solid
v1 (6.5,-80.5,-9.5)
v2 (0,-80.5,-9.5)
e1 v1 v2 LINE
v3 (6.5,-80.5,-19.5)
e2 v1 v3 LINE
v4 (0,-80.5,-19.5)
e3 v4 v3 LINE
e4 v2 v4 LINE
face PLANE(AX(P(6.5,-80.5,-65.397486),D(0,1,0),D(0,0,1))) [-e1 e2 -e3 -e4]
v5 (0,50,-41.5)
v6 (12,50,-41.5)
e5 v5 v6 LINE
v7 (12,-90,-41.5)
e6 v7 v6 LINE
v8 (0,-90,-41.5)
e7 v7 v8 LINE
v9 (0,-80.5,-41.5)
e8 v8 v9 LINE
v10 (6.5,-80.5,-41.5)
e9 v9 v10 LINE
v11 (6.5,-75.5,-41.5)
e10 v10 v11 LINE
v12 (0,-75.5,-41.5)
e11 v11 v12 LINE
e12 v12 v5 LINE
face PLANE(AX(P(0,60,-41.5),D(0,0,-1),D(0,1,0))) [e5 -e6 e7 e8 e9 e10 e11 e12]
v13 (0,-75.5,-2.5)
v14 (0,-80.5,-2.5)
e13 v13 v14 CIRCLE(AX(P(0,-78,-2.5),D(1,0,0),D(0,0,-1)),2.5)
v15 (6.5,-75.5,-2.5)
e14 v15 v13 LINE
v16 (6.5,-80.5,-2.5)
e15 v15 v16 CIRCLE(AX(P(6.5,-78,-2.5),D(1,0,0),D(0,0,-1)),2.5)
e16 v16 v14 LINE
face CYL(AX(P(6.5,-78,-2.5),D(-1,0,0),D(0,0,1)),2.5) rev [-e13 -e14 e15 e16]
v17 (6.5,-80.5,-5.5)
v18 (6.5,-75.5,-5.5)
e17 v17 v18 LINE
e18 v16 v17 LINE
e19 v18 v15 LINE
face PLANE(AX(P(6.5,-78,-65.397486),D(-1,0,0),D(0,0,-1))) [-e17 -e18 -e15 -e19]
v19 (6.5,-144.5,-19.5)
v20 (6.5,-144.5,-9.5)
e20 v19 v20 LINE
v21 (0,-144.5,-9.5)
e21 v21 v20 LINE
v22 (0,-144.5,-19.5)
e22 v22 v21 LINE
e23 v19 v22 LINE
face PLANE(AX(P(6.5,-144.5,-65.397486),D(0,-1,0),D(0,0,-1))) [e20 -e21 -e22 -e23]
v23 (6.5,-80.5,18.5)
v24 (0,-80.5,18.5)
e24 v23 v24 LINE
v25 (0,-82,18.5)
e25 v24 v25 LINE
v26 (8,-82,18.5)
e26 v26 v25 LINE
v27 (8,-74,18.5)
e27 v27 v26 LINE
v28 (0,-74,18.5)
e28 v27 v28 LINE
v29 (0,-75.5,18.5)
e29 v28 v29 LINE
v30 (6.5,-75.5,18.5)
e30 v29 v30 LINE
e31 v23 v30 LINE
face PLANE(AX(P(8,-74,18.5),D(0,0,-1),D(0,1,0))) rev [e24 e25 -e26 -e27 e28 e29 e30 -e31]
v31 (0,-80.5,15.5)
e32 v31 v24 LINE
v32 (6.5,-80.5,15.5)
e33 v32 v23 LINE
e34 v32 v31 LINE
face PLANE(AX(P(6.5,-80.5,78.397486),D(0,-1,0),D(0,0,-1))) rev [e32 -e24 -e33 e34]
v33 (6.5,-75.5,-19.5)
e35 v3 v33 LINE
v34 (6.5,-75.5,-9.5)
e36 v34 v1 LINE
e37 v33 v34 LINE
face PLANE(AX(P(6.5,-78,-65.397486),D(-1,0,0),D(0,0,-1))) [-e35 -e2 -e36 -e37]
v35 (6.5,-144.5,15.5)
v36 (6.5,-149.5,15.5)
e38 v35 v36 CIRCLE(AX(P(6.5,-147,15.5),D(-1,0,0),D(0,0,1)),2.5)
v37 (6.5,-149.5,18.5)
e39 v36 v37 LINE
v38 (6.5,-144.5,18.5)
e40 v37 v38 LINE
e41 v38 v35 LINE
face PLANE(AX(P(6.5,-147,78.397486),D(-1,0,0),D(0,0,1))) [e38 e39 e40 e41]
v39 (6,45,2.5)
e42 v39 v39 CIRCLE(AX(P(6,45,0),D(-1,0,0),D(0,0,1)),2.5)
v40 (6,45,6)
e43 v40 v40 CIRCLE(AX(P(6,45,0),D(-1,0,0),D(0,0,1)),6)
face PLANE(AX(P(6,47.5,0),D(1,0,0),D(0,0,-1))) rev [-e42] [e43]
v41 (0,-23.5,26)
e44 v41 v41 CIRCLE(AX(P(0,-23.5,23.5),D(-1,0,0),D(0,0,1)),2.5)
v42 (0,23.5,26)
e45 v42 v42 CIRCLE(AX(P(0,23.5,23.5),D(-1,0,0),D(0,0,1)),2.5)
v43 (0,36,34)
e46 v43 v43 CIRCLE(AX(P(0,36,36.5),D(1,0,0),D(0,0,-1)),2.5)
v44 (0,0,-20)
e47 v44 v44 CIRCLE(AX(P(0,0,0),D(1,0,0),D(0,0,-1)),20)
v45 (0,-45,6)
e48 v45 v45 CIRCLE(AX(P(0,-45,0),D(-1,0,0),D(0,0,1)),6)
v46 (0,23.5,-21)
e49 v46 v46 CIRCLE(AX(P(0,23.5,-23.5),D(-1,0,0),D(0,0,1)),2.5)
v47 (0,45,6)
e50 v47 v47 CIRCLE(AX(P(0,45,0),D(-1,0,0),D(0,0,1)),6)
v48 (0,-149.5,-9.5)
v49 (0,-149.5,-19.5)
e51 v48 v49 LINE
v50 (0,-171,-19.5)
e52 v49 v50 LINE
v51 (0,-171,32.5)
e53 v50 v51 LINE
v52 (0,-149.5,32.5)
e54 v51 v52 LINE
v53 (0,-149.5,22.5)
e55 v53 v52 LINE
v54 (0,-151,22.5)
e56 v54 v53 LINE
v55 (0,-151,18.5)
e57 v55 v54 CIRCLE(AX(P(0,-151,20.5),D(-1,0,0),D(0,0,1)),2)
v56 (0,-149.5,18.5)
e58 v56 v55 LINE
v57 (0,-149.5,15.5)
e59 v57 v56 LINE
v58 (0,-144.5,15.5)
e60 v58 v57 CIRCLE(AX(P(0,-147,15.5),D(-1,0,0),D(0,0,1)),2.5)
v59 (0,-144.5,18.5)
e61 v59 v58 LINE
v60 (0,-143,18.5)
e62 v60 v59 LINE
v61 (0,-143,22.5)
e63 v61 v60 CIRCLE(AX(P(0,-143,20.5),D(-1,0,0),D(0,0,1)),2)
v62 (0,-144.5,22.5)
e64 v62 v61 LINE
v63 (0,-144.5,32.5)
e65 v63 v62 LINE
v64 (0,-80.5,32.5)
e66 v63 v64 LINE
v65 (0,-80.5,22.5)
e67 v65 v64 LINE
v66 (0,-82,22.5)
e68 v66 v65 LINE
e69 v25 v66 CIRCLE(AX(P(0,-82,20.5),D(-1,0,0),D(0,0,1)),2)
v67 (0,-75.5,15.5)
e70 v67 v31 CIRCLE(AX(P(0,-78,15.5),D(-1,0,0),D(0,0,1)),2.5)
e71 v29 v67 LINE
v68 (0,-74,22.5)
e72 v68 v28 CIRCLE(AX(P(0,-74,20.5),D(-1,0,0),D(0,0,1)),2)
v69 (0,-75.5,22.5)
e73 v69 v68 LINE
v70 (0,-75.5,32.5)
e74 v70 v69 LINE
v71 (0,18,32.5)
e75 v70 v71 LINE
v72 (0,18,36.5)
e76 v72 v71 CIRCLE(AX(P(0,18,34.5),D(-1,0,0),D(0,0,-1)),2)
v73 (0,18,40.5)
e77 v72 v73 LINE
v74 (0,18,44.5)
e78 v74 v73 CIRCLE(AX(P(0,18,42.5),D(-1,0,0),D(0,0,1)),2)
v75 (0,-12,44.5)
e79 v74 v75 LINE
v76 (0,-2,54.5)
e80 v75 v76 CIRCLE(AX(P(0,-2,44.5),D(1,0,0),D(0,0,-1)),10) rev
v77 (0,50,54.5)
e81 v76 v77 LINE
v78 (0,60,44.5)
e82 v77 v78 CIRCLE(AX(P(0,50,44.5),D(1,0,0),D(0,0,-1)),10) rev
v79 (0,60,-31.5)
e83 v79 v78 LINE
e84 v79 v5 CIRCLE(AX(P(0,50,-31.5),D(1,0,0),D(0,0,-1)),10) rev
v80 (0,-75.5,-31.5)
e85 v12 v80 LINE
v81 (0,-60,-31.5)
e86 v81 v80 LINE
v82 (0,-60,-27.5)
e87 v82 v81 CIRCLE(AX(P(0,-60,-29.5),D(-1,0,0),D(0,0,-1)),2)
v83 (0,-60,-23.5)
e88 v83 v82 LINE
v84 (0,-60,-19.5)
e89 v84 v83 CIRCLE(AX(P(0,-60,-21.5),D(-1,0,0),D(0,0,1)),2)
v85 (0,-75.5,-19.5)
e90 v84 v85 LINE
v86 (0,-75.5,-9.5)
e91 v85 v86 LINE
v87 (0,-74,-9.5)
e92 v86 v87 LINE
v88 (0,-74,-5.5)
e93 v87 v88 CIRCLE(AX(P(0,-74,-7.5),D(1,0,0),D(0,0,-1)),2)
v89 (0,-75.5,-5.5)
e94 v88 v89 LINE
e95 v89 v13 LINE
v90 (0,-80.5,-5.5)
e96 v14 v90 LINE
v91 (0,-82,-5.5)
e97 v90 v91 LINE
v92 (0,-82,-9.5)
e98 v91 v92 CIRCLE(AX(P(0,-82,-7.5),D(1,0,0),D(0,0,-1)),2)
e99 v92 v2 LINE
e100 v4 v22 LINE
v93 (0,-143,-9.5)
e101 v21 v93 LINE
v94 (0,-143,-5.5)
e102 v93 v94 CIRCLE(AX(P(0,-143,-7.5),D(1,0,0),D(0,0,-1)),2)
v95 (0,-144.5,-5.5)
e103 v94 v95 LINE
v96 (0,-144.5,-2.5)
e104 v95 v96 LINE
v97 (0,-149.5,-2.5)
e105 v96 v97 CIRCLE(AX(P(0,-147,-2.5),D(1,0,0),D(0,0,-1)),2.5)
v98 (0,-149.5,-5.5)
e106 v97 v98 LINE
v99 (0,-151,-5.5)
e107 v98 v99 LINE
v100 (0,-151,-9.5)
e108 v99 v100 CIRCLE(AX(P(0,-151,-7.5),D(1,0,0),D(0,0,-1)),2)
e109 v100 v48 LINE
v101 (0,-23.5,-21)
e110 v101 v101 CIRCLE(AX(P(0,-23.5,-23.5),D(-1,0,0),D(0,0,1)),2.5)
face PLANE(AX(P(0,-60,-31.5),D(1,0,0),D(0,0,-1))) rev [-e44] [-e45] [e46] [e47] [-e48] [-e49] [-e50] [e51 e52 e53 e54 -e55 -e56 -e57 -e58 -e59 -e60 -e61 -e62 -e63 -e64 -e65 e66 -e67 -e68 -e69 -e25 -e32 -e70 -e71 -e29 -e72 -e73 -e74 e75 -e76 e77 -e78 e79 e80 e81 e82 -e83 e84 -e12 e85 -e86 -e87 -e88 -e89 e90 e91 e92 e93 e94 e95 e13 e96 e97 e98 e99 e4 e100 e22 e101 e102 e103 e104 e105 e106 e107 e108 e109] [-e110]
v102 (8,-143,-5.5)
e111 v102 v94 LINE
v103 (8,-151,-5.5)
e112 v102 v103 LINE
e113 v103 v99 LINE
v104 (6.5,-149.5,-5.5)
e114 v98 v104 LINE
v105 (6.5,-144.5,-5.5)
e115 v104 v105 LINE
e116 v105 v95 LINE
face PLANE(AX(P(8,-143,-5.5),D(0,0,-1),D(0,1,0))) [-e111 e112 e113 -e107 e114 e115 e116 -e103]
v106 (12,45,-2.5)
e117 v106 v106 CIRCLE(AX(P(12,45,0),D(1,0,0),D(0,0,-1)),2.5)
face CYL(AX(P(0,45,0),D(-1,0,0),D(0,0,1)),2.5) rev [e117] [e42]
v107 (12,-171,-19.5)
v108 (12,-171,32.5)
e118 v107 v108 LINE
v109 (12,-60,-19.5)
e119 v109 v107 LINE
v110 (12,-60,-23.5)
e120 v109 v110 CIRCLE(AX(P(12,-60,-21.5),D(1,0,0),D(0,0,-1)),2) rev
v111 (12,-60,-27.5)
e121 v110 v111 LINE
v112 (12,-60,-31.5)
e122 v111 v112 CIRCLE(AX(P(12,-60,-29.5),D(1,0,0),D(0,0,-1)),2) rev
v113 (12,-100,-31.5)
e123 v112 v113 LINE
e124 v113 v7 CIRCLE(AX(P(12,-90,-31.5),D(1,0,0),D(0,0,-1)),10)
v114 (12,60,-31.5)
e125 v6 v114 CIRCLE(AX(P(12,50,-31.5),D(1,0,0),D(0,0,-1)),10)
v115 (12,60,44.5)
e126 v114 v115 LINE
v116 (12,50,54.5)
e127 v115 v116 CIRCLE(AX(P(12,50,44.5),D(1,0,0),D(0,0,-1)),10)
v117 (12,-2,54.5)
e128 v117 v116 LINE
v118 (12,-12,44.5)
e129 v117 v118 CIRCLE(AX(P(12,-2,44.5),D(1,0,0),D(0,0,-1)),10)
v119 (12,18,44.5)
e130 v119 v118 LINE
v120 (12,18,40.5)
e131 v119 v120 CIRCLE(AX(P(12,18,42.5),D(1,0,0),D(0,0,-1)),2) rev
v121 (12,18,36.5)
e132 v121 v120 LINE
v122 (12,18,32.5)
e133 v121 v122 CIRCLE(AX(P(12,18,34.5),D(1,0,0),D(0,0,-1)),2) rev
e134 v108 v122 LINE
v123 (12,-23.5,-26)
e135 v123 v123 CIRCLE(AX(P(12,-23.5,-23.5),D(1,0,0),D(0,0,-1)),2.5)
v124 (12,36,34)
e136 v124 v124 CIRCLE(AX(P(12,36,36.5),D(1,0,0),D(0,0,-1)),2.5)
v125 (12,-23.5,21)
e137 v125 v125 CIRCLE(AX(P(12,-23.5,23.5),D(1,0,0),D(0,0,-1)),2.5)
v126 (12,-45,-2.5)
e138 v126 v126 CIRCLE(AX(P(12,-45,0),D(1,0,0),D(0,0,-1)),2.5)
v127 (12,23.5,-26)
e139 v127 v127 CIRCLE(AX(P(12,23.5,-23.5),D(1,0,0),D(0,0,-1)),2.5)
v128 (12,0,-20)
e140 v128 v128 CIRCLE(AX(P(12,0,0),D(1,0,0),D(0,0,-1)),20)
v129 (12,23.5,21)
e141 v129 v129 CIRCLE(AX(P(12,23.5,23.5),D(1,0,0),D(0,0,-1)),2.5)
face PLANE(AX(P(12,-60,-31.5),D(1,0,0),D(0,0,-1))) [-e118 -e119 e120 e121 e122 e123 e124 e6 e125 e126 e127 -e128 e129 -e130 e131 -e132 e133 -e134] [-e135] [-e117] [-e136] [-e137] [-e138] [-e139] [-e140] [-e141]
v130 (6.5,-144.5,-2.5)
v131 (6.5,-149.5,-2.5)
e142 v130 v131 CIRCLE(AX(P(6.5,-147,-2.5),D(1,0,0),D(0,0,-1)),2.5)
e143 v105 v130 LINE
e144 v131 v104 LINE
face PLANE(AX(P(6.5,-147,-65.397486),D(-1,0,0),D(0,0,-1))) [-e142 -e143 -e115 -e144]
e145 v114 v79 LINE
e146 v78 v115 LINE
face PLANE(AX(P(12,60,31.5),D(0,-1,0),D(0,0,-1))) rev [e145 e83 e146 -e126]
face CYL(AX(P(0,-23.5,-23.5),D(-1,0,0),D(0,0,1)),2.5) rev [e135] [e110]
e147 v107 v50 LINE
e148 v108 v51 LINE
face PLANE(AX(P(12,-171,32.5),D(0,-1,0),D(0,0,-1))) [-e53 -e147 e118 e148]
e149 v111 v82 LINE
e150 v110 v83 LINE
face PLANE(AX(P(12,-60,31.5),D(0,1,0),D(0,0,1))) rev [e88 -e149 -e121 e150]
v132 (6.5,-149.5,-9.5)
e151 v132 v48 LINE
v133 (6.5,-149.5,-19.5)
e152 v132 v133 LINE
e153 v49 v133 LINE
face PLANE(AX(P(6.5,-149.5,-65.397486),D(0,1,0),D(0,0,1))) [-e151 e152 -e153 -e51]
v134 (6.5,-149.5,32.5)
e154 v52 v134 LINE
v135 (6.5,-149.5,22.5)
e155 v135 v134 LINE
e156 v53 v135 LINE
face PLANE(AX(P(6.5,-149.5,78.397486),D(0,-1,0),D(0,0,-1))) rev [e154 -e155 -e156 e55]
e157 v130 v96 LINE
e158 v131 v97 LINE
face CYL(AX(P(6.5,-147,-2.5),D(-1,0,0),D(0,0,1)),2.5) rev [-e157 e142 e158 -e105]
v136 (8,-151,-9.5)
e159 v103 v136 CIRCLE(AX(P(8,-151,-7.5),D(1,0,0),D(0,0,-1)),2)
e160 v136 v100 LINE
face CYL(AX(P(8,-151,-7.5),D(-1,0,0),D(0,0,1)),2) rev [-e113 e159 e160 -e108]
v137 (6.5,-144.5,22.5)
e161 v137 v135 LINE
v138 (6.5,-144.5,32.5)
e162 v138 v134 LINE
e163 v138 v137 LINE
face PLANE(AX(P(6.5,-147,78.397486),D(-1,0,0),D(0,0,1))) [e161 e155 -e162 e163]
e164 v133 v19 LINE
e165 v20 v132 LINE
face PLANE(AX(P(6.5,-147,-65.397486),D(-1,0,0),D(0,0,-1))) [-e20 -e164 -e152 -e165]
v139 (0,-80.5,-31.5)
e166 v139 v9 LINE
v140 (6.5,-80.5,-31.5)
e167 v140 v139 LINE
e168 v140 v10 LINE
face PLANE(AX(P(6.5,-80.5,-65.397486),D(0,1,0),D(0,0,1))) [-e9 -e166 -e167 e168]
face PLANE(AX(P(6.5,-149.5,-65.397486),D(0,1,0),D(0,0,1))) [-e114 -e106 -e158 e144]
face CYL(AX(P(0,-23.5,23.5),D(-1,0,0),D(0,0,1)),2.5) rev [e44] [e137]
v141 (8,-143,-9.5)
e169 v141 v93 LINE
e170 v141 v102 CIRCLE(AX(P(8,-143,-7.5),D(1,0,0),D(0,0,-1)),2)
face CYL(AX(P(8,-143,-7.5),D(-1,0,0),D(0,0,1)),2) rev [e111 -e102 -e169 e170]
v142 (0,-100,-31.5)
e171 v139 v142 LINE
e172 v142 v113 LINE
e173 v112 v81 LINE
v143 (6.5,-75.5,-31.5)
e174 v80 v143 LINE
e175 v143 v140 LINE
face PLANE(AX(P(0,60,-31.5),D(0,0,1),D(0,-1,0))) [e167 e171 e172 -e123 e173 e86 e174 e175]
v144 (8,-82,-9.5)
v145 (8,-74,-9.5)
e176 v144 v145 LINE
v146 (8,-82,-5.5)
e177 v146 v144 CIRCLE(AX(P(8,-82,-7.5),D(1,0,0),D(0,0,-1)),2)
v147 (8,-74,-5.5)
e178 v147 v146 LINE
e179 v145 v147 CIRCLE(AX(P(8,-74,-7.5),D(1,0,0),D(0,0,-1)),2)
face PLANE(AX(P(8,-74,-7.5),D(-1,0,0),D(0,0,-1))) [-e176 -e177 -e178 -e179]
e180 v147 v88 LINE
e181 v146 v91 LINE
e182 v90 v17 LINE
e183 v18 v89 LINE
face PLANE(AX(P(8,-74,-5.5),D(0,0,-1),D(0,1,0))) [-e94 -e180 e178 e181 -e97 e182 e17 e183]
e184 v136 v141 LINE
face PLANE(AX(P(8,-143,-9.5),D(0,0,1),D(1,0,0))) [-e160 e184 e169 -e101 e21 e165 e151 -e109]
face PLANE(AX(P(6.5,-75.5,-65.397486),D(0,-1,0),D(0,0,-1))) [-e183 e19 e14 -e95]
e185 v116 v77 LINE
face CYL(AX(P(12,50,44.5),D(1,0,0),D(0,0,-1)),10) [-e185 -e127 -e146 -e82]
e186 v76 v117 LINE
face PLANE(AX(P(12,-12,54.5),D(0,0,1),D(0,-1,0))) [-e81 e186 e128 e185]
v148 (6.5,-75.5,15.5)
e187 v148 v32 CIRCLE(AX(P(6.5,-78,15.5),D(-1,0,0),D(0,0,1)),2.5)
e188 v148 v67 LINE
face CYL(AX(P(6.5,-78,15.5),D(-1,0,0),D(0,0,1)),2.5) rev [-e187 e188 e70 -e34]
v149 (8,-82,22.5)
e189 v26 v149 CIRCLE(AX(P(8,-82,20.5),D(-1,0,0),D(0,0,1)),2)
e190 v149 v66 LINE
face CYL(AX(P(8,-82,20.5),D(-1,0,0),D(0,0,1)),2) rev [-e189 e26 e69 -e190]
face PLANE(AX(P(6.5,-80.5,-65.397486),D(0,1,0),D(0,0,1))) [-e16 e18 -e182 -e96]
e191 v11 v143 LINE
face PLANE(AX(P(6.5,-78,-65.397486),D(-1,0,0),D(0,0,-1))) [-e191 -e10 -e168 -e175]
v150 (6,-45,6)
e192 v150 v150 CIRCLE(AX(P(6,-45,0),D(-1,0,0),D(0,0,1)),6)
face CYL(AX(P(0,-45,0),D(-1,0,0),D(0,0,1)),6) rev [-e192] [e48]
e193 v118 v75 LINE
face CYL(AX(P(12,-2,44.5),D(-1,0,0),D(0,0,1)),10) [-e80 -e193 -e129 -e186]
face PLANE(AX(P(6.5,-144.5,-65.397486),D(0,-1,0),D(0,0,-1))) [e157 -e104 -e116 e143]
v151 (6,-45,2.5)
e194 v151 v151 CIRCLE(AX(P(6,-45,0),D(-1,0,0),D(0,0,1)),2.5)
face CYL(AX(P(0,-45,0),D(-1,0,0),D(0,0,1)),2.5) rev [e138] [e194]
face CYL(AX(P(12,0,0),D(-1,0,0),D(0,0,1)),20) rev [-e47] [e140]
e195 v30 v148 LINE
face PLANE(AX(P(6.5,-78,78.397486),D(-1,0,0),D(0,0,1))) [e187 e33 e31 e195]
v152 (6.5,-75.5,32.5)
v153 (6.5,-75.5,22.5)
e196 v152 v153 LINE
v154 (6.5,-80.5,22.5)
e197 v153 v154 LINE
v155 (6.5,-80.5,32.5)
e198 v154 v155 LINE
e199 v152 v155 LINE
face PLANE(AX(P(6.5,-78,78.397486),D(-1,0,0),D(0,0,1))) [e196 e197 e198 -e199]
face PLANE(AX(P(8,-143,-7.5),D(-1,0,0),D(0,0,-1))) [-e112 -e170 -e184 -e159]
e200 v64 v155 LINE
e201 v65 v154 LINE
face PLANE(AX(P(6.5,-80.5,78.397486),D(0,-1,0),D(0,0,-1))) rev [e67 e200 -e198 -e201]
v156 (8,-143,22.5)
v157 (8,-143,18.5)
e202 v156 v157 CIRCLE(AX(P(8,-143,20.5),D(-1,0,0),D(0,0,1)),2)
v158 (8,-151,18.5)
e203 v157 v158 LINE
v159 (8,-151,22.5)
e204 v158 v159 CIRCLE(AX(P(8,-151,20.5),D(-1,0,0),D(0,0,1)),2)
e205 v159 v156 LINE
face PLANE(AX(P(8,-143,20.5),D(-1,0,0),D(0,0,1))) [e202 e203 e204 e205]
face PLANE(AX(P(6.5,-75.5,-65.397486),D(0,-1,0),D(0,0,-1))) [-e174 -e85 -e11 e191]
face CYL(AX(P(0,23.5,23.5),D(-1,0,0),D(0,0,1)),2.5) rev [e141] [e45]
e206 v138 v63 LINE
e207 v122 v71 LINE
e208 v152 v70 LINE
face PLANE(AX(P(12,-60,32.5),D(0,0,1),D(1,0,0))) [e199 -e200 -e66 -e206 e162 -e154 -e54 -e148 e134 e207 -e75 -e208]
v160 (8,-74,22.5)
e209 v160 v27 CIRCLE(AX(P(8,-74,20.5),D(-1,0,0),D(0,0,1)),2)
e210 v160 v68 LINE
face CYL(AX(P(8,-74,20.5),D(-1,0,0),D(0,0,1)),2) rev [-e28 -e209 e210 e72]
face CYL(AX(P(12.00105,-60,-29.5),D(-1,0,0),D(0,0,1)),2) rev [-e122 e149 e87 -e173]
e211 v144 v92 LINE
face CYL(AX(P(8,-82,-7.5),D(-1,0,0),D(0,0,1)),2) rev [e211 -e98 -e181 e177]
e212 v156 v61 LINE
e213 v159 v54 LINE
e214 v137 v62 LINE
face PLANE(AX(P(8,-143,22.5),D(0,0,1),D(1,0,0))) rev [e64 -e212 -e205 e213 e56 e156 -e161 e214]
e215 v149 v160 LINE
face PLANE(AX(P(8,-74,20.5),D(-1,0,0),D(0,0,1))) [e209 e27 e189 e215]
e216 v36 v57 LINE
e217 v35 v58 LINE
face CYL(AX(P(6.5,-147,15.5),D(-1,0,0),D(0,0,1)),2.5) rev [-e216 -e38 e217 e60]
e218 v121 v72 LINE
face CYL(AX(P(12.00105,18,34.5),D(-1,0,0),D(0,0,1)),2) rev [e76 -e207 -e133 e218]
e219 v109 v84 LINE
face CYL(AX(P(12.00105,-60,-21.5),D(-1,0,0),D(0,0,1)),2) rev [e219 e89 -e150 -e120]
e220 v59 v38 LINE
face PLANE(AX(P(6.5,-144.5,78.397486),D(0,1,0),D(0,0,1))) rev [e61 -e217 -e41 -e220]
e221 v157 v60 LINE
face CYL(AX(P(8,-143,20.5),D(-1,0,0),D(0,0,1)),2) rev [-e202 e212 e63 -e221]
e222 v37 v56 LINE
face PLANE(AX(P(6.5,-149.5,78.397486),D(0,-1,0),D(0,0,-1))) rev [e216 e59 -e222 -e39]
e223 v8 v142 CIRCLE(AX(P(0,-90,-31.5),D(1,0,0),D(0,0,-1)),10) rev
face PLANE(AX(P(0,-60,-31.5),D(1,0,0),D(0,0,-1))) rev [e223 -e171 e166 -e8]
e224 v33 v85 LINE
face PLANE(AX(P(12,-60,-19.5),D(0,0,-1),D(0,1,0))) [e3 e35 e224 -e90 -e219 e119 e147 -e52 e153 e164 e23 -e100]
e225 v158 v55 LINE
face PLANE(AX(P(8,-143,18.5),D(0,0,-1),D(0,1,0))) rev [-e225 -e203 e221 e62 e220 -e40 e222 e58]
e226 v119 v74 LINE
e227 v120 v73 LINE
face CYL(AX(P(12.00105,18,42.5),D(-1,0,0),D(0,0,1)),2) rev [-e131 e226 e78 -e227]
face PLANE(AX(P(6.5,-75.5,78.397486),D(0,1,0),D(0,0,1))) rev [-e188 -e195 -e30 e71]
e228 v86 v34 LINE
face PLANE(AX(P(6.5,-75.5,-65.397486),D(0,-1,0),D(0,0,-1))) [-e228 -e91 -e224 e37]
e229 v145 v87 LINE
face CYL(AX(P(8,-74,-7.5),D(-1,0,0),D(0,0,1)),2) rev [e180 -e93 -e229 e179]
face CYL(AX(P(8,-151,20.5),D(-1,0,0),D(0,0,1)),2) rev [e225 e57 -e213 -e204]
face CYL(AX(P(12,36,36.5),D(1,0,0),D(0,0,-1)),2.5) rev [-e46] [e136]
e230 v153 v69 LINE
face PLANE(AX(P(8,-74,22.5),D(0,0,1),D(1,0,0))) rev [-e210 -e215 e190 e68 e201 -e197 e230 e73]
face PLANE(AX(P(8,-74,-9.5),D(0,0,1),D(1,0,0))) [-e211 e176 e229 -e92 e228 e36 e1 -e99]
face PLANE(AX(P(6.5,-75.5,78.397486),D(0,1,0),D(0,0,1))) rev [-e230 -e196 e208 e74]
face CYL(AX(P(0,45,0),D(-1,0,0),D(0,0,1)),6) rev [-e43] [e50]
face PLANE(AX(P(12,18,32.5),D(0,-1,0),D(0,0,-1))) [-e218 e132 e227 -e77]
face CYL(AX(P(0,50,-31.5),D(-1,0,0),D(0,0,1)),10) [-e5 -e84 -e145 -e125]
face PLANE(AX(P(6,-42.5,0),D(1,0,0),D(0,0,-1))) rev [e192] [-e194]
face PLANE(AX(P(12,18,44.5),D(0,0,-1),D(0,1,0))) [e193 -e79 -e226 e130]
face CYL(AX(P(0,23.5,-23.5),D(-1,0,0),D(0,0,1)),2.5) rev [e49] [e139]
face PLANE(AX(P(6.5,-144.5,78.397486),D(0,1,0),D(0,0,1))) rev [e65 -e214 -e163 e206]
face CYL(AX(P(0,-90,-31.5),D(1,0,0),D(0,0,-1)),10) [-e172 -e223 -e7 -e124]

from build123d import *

# Parameters (mm, degrees)
SKETCH1_W                          = 63
SKETCH1_H                          = 120
SKETCH1_R                          = 20
BOSS_EXTRUDE1_DEPTH                = 12
F_5_0_5_DIAMETER_HOLE2_D           = 5
LINEAR_RAIL_MOUNT_HOLE_D           = 5
LINEAR_RAIL_MOUNT_HOLE_CBORE_D     = 12
LINEAR_RAIL_MOUNT_HOLE_CBORE_DEPTH = 6
BOSS_EXTRUDE2_DEPTH                = 12
SKETCH9_W                          = 52
SKETCH9_H                          = 111
BOSS_EXTRUDE3_DEPTH                = 12
SKETCH11_W                         = 10
SKETCH11_H                         = 160
BOSS_EXTRUDE4_DEPTH                = 12
F_5_0_5_DIAMETER_HOLE1_D           = 5
FILLET1_R                          = 10
CUT_EXTRUDE1_REACH                 = 181.876
CUT_EXTRUDE2_DEPTH                 = 8
CUT_EXTRUDE3_DEPTH                 = 6.5
LPATTERN1_COUNT                    = 2
LPATTERN1_PITCH                    = 69
MIRROR1_COPY_1_DEPTH               = 8
MIRROR1_COPY_2_DEPTH               = 6.5


with BuildPart() as part:
    # Sketch1 → Boss-Extrude1 (new body)
    with BuildSketch(Plane(origin=(0, 0, 0), x_dir=(0, 0, -1), z_dir=(1, 0, 0))):
        Rectangle(SKETCH1_W, SKETCH1_H)
        Circle(SKETCH1_R, mode=Mode.SUBTRACT)
    extrude(amount=BOSS_EXTRUDE1_DEPTH)

    # Ø5.0 (5) Diameter Hole2 (through all)
    with Locations(Plane.ZY):
        with Locations((-23.5, 23.5), (23.5, 23.5), (23.5, -23.5), (-23.5, -23.5)):
            Hole(F_5_0_5_DIAMETER_HOLE2_D / 2)

    # Linear Rail Mount Hole (through all)
    with Locations(Plane.ZY):
        with Locations((0, 45), (0, -45)):
            CounterBoreHole(LINEAR_RAIL_MOUNT_HOLE_D / 2, LINEAR_RAIL_MOUNT_HOLE_CBORE_D / 2, LINEAR_RAIL_MOUNT_HOLE_CBORE_DEPTH)

    # Sketch8 → Boss-Extrude2 (add)
    with BuildSketch(Plane.ZY):
        Polygon((44.5, 18), (44.5, -12), (54.5, -12), (54.5, 60), (31.5, 60), (31.5, -60), (32.5, -60), (32.5, 18), align=None)
    extrude(amount=-BOSS_EXTRUDE2_DEPTH)

    # Sketch9 → Boss-Extrude3 (add)
    with BuildSketch(Plane.ZY):
        with Locations((6.5, -115.5)):
            Rectangle(SKETCH9_W, SKETCH9_H)
    extrude(amount=-BOSS_EXTRUDE3_DEPTH)

    # Sketch11 → Boss-Extrude4 (add)
    with BuildSketch(Plane(origin=(12, 0, 0), x_dir=(0, 0, -1), z_dir=(1, 0, 0))):
        with Locations((36.5, -20)):
            Rectangle(SKETCH11_W, SKETCH11_H)
    extrude(amount=-BOSS_EXTRUDE4_DEPTH)

    # Ø5.0 (5) Diameter Hole1 (through all)
    with Locations(Plane(origin=(12, 0, 0), x_dir=(0, 0, -1), z_dir=(1, 0, 0))):
        with Locations((-36.5, 36)):
            Hole(F_5_0_5_DIAMETER_HOLE1_D / 2)

    # Fillet1
    fillet1_edges = [part.edges().sort_by_distance(p)[0] for p in [
        (6, 60, 54.5),
        (6, -12, 54.5),
        (6, -100, -41.5),
        (6, 60, -41.5),
    ]]
    fillet(fillet1_edges, radius=FILLET1_R - 0.0001)  # a hair under: the kernel refuses the full size

    # Sketch25 → Cut-Extrude1 (cut, up to next)
    with BuildSketch(Plane.ZY, mode=Mode.PRIVATE) as cut_extrude1_sk1:
        with BuildLine():
            Line((32.5, 18), (36.5, 18))
            ThreePointArc((36.5, 18), (34.5, 20), (32.5, 18))
        make_face()
    cut_extrude1_tool1 = extrude(cut_extrude1_sk1.sketch, amount=-CUT_EXTRUDE1_REACH, mode=Mode.PRIVATE) & part.part
    # Sketch25 → Cut-Extrude1 (cut, up to next)
    with BuildSketch(Plane.ZY, mode=Mode.PRIVATE) as cut_extrude1_sk2:
        with BuildLine():
            Line((40.5, 18), (44.5, 18))
            ThreePointArc((44.5, 18), (42.5, 20), (40.5, 18))
        make_face()
    cut_extrude1_tool2 = extrude(cut_extrude1_sk2.sketch, amount=-CUT_EXTRUDE1_REACH, mode=Mode.PRIVATE) & part.part
    # Sketch25 → Cut-Extrude1 (cut, up to next)
    with BuildSketch(Plane.ZY, mode=Mode.PRIVATE) as cut_extrude1_sk3:
        with BuildLine():
            Line((-31.5, -60), (-27.5, -60))
            ThreePointArc((-27.5, -60), (-29.5, -58), (-31.5, -60))
        make_face()
    cut_extrude1_tool3 = extrude(cut_extrude1_sk3.sketch, amount=-CUT_EXTRUDE1_REACH, mode=Mode.PRIVATE) & part.part
    # Sketch25 → Cut-Extrude1 (cut, up to next)
    with BuildSketch(Plane.ZY, mode=Mode.PRIVATE) as cut_extrude1_sk4:
        with BuildLine():
            Line((-23.5, -60), (-19.5, -60))
            ThreePointArc((-19.5, -60), (-21.5, -58), (-23.5, -60))
        make_face()
    cut_extrude1_tool4 = extrude(cut_extrude1_sk4.sketch, amount=-CUT_EXTRUDE1_REACH, mode=Mode.PRIVATE) & part.part
    add(cut_extrude1_tool1.solids().sort_by_distance((0, 18.848826, 34.5))[0], mode=Mode.SUBTRACT)
    add(cut_extrude1_tool2.solids().sort_by_distance((0, 18.848826, 42.5))[0], mode=Mode.SUBTRACT)
    add(cut_extrude1_tool3.solids().sort_by_distance((0, -59.151174, -29.5))[0], mode=Mode.SUBTRACT)
    add(cut_extrude1_tool4.solids().sort_by_distance((0, -59.151174, -21.5))[0], mode=Mode.SUBTRACT)

    # Sketch27 → Cut-Extrude2 (cut)
    with BuildSketch(Plane(origin=(0, 35.243272034, 16.659279863), x_dir=(0, 0, 1), z_dir=(-1, 0, 0))):
        with BuildLine():
            Line((5.840720137, -178.243272034), (5.840720137, -186.243272034))
            ThreePointArc((5.840720137, -186.243272034), (3.840720137, -188.243272034), (1.840720137, -186.243272034))
            Line((1.840720137, -186.243272034), (1.840720137, -178.243272034))
            ThreePointArc((1.840720137, -178.243272034), (3.840720137, -176.243272034), (5.840720137, -178.243272034))
        make_face()
    cut_extrude2 = extrude(amount=-CUT_EXTRUDE2_DEPTH, mode=Mode.SUBTRACT)

    # Sketch29 → Cut-Extrude3 (cut)
    with BuildSketch(Plane(origin=(0, 35.243272034, 16.659279863), x_dir=(0, 0, 1), z_dir=(-1, 0, 0))):
        with BuildLine():
            Line((61.738206335, -184.743272034), (-1.159279863, -184.743272034))
            ThreePointArc((-1.159279863, -184.743272034), (-3.659279863, -182.243272034), (-1.159279863, -179.743272034))
            Line((-1.159279863, -179.743272034), (61.738206335, -179.743272034))
            ThreePointArc((61.738206335, -179.743272034), (64.238206335, -182.243272034), (61.738206335, -184.743272034))
        make_face()
    cut_extrude3 = extrude(amount=-CUT_EXTRUDE3_DEPTH, mode=Mode.SUBTRACT)

    # LPattern1: Cut-Extrude2, Cut-Extrude3 ×2
    with Locations(*[(0, i * LPATTERN1_PITCH, 0) for i in range(1, LPATTERN1_COUNT)]):
        add(cut_extrude2, mode=Mode.SUBTRACT)
        add(cut_extrude3, mode=Mode.SUBTRACT)

    # Mirror1: Cut-Extrude2, Cut-Extrude3 across plane
    add(cut_extrude2.mirror(Plane.XY.offset(6.5)), mode=Mode.SUBTRACT)
    add(cut_extrude3.mirror(Plane.XY.offset(6.5)), mode=Mode.SUBTRACT)

    # Mirror1 copy 1 sketch → Mirror1 copy 1 (cut)
    with BuildSketch(Plane(origin=(0, 104.243272034, -3.659279863), x_dir=(0, 0, -1), z_dir=(-1, 0, 0))):
        with BuildLine():
            Line((5.840720137, 178.243272034), (5.840720137, 186.243272034))
            ThreePointArc((5.840720137, 186.243272034), (3.840720137, 188.243272034), (1.840720137, 186.243272034))
            Line((1.840720137, 186.243272034), (1.840720137, 178.243272034))
            ThreePointArc((1.840720137, 178.243272034), (3.840720137, 176.243272034), (5.840720137, 178.243272034))
        make_face()
    extrude(amount=-MIRROR1_COPY_1_DEPTH, mode=Mode.SUBTRACT)

    # Mirror1 copy 2 sketch → Mirror1 copy 2 (cut)
    with BuildSketch(Plane(origin=(0, 104.243272034, -3.659279863), x_dir=(0, 0, -1), z_dir=(-1, 0, 0))):
        with BuildLine():
            Line((61.738206335, 184.743272034), (-1.159279863, 184.743272034))
            ThreePointArc((-1.159279863, 184.743272034), (-3.659279863, 182.243272034), (-1.159279863, 179.743272034))
            Line((-1.159279863, 179.743272034), (61.738206335, 179.743272034))
            ThreePointArc((61.738206335, 179.743272034), (64.238206335, 182.243272034), (61.738206335, 184.743272034))
        make_face()
    extrude(amount=-MIRROR1_COPY_2_DEPTH, mode=Mode.SUBTRACT)


solid = part.part
